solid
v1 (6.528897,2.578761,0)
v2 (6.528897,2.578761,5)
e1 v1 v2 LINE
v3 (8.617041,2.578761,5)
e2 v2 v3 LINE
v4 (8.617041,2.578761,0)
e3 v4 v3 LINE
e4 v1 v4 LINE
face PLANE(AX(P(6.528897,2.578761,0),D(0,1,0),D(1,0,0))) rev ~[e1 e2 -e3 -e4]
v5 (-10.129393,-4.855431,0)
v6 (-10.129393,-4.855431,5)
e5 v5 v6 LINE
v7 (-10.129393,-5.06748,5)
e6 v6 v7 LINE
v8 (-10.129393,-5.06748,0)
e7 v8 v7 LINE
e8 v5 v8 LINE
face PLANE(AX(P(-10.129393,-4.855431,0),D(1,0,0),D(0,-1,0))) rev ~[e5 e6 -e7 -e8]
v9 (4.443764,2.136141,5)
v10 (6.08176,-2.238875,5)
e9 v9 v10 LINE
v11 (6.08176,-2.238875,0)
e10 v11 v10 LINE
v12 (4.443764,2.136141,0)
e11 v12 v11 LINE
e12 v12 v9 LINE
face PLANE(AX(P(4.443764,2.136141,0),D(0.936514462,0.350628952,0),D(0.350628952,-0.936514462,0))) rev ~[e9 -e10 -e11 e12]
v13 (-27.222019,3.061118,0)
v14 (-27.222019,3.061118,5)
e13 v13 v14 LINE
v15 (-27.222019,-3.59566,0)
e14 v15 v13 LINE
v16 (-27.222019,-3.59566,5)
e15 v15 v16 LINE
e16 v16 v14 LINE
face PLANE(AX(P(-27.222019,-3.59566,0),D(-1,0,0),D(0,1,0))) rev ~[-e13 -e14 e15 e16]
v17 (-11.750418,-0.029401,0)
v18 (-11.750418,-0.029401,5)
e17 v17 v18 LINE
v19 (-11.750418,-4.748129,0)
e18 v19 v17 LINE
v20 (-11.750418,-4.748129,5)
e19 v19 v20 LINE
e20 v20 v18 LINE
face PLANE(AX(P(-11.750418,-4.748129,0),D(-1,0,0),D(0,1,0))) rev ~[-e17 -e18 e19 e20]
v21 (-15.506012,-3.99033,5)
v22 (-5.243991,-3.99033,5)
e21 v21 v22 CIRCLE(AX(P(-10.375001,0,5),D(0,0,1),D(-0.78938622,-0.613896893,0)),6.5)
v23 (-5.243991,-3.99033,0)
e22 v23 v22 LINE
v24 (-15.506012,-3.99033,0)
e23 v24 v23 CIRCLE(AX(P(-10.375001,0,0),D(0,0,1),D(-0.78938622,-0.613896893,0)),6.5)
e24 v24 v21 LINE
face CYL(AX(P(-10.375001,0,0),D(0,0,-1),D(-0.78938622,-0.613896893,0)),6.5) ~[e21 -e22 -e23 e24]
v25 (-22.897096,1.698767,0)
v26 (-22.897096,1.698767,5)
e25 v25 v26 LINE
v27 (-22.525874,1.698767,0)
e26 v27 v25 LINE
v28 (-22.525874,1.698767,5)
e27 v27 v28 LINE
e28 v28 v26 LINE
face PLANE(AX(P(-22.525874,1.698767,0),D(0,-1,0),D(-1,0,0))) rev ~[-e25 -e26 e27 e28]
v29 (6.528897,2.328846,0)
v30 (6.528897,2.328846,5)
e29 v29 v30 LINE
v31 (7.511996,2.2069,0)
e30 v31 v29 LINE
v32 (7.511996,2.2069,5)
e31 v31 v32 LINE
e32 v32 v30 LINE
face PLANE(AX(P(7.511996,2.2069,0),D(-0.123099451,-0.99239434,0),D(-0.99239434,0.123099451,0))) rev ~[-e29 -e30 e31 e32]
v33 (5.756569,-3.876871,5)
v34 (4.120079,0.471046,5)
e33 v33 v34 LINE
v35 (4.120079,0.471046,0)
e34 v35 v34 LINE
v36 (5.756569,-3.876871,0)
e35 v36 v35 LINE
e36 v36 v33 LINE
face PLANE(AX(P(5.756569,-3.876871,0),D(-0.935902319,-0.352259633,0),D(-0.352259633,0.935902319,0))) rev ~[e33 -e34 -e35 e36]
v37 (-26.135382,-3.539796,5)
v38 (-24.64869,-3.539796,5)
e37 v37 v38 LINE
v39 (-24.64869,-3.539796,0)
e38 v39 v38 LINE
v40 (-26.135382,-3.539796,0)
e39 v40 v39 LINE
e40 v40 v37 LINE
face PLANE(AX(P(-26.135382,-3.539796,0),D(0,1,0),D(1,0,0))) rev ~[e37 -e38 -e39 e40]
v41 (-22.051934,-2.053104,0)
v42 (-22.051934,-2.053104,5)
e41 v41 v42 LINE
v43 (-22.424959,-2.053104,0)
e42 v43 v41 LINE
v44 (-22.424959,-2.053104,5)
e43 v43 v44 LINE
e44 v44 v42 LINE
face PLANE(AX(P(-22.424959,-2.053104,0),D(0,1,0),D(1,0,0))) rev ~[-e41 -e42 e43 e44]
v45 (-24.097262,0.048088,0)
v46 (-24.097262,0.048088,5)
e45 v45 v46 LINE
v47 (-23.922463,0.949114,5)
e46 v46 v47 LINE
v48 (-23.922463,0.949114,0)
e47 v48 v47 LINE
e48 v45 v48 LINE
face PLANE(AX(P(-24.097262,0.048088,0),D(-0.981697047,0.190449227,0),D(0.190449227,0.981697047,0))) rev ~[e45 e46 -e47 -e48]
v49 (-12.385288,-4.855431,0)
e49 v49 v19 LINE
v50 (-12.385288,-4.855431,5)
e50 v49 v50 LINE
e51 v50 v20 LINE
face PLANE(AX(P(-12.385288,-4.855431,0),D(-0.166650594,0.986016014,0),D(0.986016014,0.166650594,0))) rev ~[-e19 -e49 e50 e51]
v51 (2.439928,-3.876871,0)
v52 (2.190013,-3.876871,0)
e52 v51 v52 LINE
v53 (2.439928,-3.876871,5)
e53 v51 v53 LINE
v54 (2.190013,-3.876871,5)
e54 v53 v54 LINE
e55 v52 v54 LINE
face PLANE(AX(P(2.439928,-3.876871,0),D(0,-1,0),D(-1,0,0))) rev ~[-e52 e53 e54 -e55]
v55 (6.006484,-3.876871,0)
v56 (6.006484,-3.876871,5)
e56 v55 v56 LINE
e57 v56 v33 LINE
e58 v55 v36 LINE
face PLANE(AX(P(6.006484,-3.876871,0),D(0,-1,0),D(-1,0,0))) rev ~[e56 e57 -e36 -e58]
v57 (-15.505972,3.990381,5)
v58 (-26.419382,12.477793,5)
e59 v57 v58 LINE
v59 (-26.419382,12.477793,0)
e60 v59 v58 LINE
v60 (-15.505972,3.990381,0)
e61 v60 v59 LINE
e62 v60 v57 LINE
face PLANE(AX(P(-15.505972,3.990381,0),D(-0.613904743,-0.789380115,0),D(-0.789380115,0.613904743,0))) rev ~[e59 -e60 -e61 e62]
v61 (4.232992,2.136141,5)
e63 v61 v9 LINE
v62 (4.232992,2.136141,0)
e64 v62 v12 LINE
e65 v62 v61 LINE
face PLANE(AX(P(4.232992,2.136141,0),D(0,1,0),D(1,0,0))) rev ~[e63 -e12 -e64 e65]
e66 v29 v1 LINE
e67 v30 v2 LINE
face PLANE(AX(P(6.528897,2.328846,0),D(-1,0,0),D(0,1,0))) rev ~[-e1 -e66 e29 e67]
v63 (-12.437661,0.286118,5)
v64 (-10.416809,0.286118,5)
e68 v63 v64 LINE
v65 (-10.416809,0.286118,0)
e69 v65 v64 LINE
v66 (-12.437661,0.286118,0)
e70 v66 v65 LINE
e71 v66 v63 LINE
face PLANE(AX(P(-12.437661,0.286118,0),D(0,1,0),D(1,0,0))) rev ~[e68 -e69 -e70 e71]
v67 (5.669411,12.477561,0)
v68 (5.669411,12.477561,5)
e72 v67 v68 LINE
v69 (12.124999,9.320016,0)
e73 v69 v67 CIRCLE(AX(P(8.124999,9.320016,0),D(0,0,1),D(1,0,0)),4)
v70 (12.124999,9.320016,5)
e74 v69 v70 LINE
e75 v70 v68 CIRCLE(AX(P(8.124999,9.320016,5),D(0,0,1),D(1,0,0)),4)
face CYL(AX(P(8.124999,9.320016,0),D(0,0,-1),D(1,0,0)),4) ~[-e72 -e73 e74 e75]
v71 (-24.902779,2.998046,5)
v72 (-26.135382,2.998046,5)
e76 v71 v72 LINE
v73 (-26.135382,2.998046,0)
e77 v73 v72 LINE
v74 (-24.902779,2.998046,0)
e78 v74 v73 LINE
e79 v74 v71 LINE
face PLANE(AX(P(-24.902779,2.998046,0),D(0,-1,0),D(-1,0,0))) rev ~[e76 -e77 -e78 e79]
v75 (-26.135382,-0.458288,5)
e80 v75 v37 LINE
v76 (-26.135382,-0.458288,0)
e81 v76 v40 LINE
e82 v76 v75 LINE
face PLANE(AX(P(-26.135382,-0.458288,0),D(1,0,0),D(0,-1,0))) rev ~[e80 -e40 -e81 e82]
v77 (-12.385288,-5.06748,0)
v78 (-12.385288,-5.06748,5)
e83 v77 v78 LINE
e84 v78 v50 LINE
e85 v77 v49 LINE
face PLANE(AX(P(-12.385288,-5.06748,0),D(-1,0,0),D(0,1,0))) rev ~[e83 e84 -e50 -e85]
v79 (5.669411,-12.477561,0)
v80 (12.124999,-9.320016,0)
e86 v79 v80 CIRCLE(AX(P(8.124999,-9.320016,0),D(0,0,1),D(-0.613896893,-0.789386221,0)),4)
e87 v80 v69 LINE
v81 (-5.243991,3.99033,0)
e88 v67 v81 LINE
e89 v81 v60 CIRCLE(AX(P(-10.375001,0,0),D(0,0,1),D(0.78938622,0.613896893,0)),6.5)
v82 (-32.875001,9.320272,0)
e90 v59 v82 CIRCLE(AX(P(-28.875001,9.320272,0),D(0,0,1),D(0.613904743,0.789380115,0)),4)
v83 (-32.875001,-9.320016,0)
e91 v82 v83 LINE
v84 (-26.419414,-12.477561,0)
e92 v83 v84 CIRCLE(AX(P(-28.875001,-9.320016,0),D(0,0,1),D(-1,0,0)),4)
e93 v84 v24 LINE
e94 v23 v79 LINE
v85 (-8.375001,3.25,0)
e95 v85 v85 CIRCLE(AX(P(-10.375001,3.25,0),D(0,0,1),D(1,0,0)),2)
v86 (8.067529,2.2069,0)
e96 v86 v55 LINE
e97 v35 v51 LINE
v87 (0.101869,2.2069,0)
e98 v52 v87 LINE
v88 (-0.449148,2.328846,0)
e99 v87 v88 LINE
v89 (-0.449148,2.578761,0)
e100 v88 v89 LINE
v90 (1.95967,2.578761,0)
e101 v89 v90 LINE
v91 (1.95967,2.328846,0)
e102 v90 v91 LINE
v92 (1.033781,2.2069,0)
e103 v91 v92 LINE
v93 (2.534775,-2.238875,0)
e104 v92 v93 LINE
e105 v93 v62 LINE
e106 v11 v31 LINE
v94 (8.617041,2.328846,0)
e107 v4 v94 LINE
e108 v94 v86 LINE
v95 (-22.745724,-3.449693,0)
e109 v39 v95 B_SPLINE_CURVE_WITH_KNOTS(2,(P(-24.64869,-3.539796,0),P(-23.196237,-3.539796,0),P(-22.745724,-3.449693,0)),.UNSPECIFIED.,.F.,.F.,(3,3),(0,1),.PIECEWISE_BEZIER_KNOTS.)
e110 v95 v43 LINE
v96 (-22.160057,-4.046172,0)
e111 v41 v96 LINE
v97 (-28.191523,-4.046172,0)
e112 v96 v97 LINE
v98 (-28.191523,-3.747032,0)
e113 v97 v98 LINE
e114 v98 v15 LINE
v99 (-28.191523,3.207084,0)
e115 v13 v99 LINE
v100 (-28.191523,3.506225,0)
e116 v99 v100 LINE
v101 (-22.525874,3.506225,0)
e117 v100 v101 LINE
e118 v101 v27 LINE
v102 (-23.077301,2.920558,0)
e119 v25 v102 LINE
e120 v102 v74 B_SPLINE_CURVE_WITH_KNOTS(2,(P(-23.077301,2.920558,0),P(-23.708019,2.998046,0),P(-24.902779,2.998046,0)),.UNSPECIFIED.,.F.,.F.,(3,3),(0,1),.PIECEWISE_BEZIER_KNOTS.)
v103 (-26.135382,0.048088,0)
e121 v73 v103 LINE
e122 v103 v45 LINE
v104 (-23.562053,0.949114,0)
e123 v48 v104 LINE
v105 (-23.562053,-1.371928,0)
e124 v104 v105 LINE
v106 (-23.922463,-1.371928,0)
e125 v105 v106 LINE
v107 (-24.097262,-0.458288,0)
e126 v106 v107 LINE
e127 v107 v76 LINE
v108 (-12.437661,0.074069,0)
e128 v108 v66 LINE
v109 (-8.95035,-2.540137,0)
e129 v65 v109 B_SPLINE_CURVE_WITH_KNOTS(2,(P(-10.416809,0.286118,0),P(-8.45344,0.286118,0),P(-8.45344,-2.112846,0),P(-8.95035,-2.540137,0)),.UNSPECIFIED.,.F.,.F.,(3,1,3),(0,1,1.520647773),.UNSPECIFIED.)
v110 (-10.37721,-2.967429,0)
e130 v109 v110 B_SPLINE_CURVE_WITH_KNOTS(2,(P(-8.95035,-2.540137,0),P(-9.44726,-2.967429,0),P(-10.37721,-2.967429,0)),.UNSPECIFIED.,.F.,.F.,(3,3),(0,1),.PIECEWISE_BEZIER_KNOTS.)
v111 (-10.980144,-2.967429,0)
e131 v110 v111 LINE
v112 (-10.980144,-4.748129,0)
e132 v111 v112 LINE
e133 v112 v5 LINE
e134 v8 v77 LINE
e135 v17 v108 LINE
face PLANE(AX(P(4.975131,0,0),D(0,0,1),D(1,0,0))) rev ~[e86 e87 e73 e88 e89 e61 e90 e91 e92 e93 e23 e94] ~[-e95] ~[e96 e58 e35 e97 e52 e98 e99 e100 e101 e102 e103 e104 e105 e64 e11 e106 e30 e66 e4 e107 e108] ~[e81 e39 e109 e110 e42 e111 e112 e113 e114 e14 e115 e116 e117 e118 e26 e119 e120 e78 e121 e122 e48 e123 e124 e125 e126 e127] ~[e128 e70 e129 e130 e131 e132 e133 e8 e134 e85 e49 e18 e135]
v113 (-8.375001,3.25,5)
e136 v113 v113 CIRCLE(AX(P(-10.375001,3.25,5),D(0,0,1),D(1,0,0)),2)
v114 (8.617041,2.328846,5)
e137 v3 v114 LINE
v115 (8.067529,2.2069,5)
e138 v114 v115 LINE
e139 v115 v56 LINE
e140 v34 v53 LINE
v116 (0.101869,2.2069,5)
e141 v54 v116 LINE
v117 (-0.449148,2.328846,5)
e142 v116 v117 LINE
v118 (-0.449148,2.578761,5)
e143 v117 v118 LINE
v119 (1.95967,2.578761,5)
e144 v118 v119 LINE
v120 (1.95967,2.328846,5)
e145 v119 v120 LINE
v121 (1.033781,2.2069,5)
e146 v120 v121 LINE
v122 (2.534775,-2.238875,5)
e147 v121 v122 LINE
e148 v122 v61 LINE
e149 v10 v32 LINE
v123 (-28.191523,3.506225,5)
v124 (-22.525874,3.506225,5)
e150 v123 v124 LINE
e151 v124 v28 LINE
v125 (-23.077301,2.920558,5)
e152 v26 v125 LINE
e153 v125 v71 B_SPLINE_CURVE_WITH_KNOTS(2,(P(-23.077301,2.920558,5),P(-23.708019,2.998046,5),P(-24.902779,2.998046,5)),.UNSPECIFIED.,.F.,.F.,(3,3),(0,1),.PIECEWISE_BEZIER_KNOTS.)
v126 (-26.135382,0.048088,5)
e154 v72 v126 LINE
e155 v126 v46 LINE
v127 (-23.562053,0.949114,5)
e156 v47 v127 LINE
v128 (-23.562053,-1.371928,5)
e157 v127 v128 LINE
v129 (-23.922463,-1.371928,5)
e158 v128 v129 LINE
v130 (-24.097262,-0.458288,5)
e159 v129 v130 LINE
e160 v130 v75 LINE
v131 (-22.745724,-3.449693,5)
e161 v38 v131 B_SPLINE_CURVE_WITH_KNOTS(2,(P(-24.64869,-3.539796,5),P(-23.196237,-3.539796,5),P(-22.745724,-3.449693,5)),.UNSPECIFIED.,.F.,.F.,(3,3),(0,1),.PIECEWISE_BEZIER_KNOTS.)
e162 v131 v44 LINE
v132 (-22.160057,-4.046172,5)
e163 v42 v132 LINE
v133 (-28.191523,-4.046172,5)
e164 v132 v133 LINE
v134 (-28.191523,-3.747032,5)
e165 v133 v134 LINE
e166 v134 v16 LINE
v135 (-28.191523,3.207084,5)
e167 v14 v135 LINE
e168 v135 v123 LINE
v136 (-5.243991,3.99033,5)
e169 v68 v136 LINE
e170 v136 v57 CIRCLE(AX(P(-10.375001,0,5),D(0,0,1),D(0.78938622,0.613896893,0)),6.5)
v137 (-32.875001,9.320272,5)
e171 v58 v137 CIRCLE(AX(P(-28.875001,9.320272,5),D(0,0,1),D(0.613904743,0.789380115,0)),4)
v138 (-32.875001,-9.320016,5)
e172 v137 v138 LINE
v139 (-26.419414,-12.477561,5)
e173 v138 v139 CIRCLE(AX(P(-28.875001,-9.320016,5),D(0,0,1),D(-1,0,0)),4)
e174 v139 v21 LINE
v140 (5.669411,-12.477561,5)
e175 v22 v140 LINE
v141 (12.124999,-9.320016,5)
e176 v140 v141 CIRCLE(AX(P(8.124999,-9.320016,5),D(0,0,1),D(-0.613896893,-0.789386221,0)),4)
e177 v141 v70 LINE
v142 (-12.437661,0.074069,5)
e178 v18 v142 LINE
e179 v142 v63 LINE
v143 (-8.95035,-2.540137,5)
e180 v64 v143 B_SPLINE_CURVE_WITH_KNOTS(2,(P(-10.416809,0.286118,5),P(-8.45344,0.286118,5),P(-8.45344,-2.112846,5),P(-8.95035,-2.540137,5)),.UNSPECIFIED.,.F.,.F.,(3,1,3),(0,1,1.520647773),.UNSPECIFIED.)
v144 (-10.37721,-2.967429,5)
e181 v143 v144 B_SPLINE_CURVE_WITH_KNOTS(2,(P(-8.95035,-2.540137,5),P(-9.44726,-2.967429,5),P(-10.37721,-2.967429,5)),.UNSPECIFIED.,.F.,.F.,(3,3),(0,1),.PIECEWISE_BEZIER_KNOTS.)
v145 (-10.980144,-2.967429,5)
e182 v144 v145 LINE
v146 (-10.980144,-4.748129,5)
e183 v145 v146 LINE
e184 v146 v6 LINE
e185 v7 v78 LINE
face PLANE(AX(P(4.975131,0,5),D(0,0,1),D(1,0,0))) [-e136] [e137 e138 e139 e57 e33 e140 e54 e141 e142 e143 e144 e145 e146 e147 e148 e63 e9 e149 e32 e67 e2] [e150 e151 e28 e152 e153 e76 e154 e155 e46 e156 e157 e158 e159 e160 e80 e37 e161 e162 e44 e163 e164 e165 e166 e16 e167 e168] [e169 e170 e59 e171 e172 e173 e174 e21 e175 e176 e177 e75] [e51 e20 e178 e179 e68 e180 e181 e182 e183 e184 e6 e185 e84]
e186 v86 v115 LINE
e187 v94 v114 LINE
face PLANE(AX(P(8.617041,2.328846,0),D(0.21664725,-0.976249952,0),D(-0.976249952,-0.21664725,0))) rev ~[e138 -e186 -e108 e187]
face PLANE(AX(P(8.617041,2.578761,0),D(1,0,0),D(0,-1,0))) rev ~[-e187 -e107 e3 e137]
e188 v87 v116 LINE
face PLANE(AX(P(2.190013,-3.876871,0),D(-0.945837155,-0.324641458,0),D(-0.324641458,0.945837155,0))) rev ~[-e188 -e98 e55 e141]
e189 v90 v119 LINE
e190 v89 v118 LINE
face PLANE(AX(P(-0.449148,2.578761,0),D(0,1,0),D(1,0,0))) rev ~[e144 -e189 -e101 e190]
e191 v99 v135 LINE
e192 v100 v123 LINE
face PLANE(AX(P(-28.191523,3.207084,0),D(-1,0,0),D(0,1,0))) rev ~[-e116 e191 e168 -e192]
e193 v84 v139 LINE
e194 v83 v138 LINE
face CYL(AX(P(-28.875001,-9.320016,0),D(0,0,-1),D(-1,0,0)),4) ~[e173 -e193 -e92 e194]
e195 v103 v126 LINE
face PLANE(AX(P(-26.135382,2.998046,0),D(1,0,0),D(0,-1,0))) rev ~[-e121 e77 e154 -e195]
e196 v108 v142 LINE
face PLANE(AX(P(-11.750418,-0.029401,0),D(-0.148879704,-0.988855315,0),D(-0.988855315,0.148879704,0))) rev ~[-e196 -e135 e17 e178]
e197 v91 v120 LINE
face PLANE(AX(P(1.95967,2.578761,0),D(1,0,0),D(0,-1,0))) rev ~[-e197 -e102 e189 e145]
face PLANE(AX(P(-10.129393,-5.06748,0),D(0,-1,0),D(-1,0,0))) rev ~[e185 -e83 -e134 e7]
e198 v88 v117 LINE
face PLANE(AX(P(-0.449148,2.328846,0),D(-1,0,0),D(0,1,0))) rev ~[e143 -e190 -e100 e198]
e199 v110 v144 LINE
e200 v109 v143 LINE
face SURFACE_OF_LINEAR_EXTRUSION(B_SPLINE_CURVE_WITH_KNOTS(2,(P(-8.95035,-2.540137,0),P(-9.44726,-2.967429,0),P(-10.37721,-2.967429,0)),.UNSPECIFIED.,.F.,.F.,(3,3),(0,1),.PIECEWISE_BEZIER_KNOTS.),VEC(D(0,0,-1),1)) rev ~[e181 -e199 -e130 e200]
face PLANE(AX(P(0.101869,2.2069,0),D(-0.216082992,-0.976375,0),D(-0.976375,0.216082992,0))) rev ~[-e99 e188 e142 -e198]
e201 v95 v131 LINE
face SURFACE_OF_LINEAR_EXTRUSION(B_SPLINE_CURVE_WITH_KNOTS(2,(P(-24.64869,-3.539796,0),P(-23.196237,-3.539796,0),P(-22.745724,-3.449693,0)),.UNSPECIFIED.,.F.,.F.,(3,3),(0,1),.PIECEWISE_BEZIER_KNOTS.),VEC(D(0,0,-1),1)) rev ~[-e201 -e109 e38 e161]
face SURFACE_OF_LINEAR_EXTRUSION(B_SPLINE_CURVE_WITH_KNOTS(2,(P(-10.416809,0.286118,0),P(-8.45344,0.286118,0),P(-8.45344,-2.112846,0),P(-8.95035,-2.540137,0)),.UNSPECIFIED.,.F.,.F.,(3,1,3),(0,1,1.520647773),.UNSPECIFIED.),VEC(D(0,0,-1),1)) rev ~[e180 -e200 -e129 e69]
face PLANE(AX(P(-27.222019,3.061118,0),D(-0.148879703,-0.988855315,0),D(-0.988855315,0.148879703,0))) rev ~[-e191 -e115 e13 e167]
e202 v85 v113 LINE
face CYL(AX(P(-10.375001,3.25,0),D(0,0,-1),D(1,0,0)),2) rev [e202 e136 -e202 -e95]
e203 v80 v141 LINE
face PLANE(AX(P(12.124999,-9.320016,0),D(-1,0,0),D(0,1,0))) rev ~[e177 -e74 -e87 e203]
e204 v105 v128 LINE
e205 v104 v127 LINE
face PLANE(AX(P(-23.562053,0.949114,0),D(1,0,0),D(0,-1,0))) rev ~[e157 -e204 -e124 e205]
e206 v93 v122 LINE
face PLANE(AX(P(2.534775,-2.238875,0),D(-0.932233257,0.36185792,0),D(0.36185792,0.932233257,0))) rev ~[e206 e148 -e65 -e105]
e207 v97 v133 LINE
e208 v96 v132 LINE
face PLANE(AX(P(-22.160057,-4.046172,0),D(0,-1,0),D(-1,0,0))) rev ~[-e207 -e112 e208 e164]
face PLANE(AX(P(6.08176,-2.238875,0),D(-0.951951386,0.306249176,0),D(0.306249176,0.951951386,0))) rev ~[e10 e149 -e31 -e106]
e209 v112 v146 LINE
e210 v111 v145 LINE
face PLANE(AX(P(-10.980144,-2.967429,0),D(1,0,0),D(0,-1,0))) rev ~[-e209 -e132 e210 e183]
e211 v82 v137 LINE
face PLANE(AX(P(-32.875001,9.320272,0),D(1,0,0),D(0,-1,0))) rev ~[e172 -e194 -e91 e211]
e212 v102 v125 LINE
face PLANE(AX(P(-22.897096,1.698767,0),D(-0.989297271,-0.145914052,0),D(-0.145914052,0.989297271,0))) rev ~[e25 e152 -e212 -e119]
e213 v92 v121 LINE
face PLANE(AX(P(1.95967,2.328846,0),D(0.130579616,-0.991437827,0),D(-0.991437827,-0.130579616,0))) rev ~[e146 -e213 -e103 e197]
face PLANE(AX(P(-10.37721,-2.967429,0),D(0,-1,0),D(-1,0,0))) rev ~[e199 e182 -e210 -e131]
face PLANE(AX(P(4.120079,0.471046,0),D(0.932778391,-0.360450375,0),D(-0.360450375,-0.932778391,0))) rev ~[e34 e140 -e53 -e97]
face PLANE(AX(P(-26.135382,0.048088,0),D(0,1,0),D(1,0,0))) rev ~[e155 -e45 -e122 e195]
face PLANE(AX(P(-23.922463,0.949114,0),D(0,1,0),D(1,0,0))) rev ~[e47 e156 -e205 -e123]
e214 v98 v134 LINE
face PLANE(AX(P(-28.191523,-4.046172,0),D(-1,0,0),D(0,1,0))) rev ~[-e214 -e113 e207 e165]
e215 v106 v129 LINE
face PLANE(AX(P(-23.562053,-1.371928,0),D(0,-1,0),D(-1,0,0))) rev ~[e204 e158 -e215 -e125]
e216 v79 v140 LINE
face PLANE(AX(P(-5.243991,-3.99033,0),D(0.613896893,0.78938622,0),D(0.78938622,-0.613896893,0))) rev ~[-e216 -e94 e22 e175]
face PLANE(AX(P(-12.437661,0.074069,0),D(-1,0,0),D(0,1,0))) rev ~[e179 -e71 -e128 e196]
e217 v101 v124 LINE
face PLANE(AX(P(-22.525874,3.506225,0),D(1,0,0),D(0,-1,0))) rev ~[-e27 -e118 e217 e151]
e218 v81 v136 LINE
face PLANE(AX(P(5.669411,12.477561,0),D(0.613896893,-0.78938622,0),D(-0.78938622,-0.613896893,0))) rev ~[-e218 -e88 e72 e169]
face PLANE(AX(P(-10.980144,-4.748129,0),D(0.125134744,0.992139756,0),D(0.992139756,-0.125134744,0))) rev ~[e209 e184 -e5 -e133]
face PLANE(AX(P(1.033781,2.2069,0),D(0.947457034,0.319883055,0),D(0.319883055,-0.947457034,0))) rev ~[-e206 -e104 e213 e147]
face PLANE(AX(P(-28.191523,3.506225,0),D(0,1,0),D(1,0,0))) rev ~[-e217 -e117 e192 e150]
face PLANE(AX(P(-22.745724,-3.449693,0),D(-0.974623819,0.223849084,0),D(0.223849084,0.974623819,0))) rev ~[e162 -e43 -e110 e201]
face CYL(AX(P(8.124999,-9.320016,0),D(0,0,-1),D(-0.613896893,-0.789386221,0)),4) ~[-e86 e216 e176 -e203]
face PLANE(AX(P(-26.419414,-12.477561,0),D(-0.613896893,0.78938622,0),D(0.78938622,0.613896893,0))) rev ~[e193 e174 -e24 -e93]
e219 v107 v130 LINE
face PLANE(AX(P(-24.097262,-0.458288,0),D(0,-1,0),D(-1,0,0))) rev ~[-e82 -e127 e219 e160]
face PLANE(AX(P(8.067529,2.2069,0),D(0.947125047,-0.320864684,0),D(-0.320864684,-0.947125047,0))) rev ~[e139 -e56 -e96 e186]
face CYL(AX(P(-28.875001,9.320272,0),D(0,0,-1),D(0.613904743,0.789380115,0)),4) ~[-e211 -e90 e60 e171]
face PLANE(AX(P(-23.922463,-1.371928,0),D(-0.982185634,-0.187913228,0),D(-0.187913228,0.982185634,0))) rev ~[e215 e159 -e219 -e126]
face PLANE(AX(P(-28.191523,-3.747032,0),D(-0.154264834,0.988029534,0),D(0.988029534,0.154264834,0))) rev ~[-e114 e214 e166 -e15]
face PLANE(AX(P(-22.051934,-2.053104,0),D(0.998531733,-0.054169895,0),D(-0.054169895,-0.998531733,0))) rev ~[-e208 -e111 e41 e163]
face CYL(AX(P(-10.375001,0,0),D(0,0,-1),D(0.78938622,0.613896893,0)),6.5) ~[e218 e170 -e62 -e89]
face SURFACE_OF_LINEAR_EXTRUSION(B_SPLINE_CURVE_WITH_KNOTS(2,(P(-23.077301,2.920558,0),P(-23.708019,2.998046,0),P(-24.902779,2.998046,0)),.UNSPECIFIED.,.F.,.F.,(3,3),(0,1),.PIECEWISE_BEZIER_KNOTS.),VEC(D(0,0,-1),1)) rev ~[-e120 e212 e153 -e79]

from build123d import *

# Parameters (mm, degrees)
F0_R     = 2
F1_DEPTH = 5


with BuildPart() as f1:
    # F0 (on Top) → F1 (new body)
    with BuildSketch(Plane.XY):
        with BuildLine():
            ThreePointArc((-3.8750014305, 0), (-4.2267672199, -2.1093164988), (-5.2439909973, -3.9903298027))
            Line((-5.2439909973, -3.9903298027), (5.6694109986, -12.4775612749))
            ThreePointArc((5.6694109986, -12.4775612749), (9.8825038634, -12.9132287637), (12.1249985695, -9.3200163929))
            Line((12.1249985695, -9.3200163929), (12.1249985695, 9.3200163929))
            ThreePointArc((12.1249985695, 9.3200163929), (9.8825038634, 12.9132287637), (5.6694109986, 12.4775612749))
            Line((5.6694109986, 12.4775612749), (-5.2439909973, 3.9903298027))
            ThreePointArc((-5.2439909973, 3.9903298027), (-4.2267672199, 2.1093164988), (-3.8750014305, 0))
        make_face()
        Polygon((8.0675292322, 2.2068999953), (6.0064843484, -3.8768709144), (5.756569483, -3.8768709144), (4.1200787681, 0.4710455388), (2.4399282273, -3.8768709144), (2.1900133619, -3.8768709144), (0.1018692759, 2.2068999953), (-0.449147837, 2.3288464056), (-0.449147837, 2.5787612709), (1.9596701426, 2.5787612709), (1.9596701426, 2.3288464056), (1.0337807317, 2.2068999953), (2.5347754353, -2.2388746883), (4.2329921109, 2.1361409672), (4.4437636841, 2.1361409672), (6.0817599103, -2.2388746883), (7.5119955856, 2.2068999953), (6.5288967477, 2.3288464056), (6.5288967477, 2.5787612709), (8.6170408338, 2.5787612709), (8.6170408338, 2.3288464056), align=None, mode=Mode.SUBTRACT)
        with BuildLine():
            ThreePointArc((-15.5059721811, 3.9903808286), (-16.8750014304, 3.23201e-05), (-15.5060118637, -3.9903298027))
            ThreePointArc((-15.5060118637, -3.9903298027), (-10.3750014305, -6.5), (-5.2439909973, -3.9903298027))
            ThreePointArc((-5.2439909973, -3.9903298027), (-4.2267672199, -2.1093164988), (-3.8750014305, 0))
            ThreePointArc((-3.8750014305, 0), (-4.2267672199, 2.1093164988), (-5.2439909973, 3.9903298027))
            ThreePointArc((-5.2439909973, 3.9903298027), (-10.3749691104, 6.4999999999), (-15.5059721811, 3.9903808286))
        make_face()
        with BuildLine():
            Line((-10.3772096263, -2.9674286779), (-10.9801440776, -2.9674286779))
            Line((-10.9801440776, -2.9674286779), (-10.9801440776, -4.7481291549))
            Line((-10.9801440776, -4.7481291549), (-10.1293933476, -4.8554310488))
            Line((-10.1293933476, -4.8554310488), (-10.1293933476, -5.0674800295))
            Line((-10.1293933476, -5.0674800295), (-12.385287926, -5.0674800295))
            Line((-12.385287926, -5.0674800295), (-12.385287926, -4.8554310488))
            Line((-12.385287926, -4.8554310488), (-11.7504183872, -4.7481291549))
            Line((-11.7504183872, -4.7481291549), (-11.7504183872, -0.0294006313))
            Line((-11.7504183872, -0.0294006313), (-12.4376614694, 0.0740690521))
            Line((-12.4376614694, 0.0740690521), (-12.4376614694, 0.2861180328))
            Line((-12.4376614694, 0.2861180328), (-10.4168091348, 0.2861180328))
            add(Edge.make_bspline(
                [(-10.4168091348, 0.2861180328), (-8.4534399575, 0.2861180328), (-8.4534399575, -1.2914752879)],
                knots=[0, 0, 0, 1, 1, 1], degree=2))
            add(Edge.make_bspline(
                [(-8.4534399575, -1.2914752879), (-8.4534399575, -2.1128457374), (-8.9503499185, -2.5401372077)],
                knots=[0, 0, 0, 1, 1, 1], degree=2))
            add(Edge.make_bspline(
                [(-8.9503499185, -2.5401372077), (-9.4472598794, -2.9674286779), (-10.3772096263, -2.9674286779)],
                knots=[0, 0, 0, 1, 1, 1], degree=2))
        make_face(mode=Mode.SUBTRACT)
        with Locations((-10.3750014305, 3.25)):
            Circle(F0_R, mode=Mode.SUBTRACT)
        with BuildLine():
            Line((-32.8750014305, 9.3202724501), (-32.8750014305, -9.3200163929))
            ThreePointArc((-32.8750014305, -9.3200163929), (-30.6325067245, -12.9132287637), (-26.4194138596, -12.4775612749))
            Line((-26.4194138596, -12.4775612749), (-15.5060118637, -3.9903298027))
            ThreePointArc((-15.5060118637, -3.9903298027), (-16.8750014304, 3.23201e-05), (-15.5059721811, 3.9903808286))
            Line((-15.5059721811, 3.9903808286), (-26.4193824591, 12.477792912))
            ThreePointArc((-26.4193824591, 12.477792912), (-30.6324888578, 12.9134935598), (-32.8750014305, 9.3202724501))
        make_face()
        with BuildLine():
            Line((-28.1915230864, -4.0461723693), (-28.1915230864, -3.7470318405))
            Line((-28.1915230864, -3.7470318405), (-27.2220194448, -3.5956595247))
            Line((-27.2220194448, -3.5956595247), (-27.2220194448, 3.0611182673))
            Line((-27.2220194448, 3.0611182673), (-28.1915230864, 3.2070844289))
            Line((-28.1915230864, 3.2070844289), (-28.1915230864, 3.5062249578))
            Line((-28.1915230864, 3.5062249578), (-22.5258735526, 3.5062249578))
            Line((-22.5258735526, 3.5062249578), (-22.5258735526, 1.6987674252))
            Line((-22.5258735526, 1.6987674252), (-22.8970961366, 1.6987674252))
            Line((-22.8970961366, 1.6987674252), (-23.0773012744, 2.9205582598))
            add(Edge.make_bspline(
                [(-23.0773012744, 2.9205582598), (-23.7080192569, 2.9980464691), (-24.9027793208, 2.9980464691)],
                knots=[0, 0, 0, 1, 1, 1], degree=2))
            Line((-24.9027793208, 2.9980464691), (-26.1353824636, 2.9980464691))
            Line((-26.1353824636, 2.9980464691), (-26.1353824636, 0.0480883625))
            Line((-26.1353824636, 0.0480883625), (-24.0972623546, 0.0480883625))
            Line((-24.0972623546, 0.0480883625), (-23.9224633709, 0.9491140518))
            Line((-23.9224633709, 0.9491140518), (-23.5620530952, 0.9491140518))
            Line((-23.5620530952, 0.9491140518), (-23.5620530952, -1.3719281237))
            Line((-23.5620530952, -1.3719281237), (-23.9224633709, -1.3719281237))
            Line((-23.9224633709, -1.3719281237), (-24.0972623546, -0.4582880748))
            Line((-24.0972623546, -0.4582880748), (-26.1353824636, -0.4582880748))
            Line((-26.1353824636, -0.4582880748), (-26.1353824636, -3.5397959319))
            Line((-26.1353824636, -3.5397959319), (-24.6486900764, -3.5397959319))
            add(Edge.make_bspline(
                [(-24.6486900764, -3.5397959319), (-23.1962366654, -3.5397959319), (-22.7457238208, -3.449693363)],
                knots=[0, 0, 0, 1, 1, 1], degree=2))
            Line((-22.7457238208, -3.449693363), (-22.4249586754, -2.0531035447))
            Line((-22.4249586754, -2.0531035447), (-22.0519340401, -2.0531035447))
            Line((-22.0519340401, -2.0531035447), (-22.1600571228, -4.0461723693))
            Line((-22.1600571228, -4.0461723693), (-28.1915230864, -4.0461723693))
        make_face(mode=Mode.SUBTRACT)
    extrude(amount=F1_DEPTH)


solid = f1.part
